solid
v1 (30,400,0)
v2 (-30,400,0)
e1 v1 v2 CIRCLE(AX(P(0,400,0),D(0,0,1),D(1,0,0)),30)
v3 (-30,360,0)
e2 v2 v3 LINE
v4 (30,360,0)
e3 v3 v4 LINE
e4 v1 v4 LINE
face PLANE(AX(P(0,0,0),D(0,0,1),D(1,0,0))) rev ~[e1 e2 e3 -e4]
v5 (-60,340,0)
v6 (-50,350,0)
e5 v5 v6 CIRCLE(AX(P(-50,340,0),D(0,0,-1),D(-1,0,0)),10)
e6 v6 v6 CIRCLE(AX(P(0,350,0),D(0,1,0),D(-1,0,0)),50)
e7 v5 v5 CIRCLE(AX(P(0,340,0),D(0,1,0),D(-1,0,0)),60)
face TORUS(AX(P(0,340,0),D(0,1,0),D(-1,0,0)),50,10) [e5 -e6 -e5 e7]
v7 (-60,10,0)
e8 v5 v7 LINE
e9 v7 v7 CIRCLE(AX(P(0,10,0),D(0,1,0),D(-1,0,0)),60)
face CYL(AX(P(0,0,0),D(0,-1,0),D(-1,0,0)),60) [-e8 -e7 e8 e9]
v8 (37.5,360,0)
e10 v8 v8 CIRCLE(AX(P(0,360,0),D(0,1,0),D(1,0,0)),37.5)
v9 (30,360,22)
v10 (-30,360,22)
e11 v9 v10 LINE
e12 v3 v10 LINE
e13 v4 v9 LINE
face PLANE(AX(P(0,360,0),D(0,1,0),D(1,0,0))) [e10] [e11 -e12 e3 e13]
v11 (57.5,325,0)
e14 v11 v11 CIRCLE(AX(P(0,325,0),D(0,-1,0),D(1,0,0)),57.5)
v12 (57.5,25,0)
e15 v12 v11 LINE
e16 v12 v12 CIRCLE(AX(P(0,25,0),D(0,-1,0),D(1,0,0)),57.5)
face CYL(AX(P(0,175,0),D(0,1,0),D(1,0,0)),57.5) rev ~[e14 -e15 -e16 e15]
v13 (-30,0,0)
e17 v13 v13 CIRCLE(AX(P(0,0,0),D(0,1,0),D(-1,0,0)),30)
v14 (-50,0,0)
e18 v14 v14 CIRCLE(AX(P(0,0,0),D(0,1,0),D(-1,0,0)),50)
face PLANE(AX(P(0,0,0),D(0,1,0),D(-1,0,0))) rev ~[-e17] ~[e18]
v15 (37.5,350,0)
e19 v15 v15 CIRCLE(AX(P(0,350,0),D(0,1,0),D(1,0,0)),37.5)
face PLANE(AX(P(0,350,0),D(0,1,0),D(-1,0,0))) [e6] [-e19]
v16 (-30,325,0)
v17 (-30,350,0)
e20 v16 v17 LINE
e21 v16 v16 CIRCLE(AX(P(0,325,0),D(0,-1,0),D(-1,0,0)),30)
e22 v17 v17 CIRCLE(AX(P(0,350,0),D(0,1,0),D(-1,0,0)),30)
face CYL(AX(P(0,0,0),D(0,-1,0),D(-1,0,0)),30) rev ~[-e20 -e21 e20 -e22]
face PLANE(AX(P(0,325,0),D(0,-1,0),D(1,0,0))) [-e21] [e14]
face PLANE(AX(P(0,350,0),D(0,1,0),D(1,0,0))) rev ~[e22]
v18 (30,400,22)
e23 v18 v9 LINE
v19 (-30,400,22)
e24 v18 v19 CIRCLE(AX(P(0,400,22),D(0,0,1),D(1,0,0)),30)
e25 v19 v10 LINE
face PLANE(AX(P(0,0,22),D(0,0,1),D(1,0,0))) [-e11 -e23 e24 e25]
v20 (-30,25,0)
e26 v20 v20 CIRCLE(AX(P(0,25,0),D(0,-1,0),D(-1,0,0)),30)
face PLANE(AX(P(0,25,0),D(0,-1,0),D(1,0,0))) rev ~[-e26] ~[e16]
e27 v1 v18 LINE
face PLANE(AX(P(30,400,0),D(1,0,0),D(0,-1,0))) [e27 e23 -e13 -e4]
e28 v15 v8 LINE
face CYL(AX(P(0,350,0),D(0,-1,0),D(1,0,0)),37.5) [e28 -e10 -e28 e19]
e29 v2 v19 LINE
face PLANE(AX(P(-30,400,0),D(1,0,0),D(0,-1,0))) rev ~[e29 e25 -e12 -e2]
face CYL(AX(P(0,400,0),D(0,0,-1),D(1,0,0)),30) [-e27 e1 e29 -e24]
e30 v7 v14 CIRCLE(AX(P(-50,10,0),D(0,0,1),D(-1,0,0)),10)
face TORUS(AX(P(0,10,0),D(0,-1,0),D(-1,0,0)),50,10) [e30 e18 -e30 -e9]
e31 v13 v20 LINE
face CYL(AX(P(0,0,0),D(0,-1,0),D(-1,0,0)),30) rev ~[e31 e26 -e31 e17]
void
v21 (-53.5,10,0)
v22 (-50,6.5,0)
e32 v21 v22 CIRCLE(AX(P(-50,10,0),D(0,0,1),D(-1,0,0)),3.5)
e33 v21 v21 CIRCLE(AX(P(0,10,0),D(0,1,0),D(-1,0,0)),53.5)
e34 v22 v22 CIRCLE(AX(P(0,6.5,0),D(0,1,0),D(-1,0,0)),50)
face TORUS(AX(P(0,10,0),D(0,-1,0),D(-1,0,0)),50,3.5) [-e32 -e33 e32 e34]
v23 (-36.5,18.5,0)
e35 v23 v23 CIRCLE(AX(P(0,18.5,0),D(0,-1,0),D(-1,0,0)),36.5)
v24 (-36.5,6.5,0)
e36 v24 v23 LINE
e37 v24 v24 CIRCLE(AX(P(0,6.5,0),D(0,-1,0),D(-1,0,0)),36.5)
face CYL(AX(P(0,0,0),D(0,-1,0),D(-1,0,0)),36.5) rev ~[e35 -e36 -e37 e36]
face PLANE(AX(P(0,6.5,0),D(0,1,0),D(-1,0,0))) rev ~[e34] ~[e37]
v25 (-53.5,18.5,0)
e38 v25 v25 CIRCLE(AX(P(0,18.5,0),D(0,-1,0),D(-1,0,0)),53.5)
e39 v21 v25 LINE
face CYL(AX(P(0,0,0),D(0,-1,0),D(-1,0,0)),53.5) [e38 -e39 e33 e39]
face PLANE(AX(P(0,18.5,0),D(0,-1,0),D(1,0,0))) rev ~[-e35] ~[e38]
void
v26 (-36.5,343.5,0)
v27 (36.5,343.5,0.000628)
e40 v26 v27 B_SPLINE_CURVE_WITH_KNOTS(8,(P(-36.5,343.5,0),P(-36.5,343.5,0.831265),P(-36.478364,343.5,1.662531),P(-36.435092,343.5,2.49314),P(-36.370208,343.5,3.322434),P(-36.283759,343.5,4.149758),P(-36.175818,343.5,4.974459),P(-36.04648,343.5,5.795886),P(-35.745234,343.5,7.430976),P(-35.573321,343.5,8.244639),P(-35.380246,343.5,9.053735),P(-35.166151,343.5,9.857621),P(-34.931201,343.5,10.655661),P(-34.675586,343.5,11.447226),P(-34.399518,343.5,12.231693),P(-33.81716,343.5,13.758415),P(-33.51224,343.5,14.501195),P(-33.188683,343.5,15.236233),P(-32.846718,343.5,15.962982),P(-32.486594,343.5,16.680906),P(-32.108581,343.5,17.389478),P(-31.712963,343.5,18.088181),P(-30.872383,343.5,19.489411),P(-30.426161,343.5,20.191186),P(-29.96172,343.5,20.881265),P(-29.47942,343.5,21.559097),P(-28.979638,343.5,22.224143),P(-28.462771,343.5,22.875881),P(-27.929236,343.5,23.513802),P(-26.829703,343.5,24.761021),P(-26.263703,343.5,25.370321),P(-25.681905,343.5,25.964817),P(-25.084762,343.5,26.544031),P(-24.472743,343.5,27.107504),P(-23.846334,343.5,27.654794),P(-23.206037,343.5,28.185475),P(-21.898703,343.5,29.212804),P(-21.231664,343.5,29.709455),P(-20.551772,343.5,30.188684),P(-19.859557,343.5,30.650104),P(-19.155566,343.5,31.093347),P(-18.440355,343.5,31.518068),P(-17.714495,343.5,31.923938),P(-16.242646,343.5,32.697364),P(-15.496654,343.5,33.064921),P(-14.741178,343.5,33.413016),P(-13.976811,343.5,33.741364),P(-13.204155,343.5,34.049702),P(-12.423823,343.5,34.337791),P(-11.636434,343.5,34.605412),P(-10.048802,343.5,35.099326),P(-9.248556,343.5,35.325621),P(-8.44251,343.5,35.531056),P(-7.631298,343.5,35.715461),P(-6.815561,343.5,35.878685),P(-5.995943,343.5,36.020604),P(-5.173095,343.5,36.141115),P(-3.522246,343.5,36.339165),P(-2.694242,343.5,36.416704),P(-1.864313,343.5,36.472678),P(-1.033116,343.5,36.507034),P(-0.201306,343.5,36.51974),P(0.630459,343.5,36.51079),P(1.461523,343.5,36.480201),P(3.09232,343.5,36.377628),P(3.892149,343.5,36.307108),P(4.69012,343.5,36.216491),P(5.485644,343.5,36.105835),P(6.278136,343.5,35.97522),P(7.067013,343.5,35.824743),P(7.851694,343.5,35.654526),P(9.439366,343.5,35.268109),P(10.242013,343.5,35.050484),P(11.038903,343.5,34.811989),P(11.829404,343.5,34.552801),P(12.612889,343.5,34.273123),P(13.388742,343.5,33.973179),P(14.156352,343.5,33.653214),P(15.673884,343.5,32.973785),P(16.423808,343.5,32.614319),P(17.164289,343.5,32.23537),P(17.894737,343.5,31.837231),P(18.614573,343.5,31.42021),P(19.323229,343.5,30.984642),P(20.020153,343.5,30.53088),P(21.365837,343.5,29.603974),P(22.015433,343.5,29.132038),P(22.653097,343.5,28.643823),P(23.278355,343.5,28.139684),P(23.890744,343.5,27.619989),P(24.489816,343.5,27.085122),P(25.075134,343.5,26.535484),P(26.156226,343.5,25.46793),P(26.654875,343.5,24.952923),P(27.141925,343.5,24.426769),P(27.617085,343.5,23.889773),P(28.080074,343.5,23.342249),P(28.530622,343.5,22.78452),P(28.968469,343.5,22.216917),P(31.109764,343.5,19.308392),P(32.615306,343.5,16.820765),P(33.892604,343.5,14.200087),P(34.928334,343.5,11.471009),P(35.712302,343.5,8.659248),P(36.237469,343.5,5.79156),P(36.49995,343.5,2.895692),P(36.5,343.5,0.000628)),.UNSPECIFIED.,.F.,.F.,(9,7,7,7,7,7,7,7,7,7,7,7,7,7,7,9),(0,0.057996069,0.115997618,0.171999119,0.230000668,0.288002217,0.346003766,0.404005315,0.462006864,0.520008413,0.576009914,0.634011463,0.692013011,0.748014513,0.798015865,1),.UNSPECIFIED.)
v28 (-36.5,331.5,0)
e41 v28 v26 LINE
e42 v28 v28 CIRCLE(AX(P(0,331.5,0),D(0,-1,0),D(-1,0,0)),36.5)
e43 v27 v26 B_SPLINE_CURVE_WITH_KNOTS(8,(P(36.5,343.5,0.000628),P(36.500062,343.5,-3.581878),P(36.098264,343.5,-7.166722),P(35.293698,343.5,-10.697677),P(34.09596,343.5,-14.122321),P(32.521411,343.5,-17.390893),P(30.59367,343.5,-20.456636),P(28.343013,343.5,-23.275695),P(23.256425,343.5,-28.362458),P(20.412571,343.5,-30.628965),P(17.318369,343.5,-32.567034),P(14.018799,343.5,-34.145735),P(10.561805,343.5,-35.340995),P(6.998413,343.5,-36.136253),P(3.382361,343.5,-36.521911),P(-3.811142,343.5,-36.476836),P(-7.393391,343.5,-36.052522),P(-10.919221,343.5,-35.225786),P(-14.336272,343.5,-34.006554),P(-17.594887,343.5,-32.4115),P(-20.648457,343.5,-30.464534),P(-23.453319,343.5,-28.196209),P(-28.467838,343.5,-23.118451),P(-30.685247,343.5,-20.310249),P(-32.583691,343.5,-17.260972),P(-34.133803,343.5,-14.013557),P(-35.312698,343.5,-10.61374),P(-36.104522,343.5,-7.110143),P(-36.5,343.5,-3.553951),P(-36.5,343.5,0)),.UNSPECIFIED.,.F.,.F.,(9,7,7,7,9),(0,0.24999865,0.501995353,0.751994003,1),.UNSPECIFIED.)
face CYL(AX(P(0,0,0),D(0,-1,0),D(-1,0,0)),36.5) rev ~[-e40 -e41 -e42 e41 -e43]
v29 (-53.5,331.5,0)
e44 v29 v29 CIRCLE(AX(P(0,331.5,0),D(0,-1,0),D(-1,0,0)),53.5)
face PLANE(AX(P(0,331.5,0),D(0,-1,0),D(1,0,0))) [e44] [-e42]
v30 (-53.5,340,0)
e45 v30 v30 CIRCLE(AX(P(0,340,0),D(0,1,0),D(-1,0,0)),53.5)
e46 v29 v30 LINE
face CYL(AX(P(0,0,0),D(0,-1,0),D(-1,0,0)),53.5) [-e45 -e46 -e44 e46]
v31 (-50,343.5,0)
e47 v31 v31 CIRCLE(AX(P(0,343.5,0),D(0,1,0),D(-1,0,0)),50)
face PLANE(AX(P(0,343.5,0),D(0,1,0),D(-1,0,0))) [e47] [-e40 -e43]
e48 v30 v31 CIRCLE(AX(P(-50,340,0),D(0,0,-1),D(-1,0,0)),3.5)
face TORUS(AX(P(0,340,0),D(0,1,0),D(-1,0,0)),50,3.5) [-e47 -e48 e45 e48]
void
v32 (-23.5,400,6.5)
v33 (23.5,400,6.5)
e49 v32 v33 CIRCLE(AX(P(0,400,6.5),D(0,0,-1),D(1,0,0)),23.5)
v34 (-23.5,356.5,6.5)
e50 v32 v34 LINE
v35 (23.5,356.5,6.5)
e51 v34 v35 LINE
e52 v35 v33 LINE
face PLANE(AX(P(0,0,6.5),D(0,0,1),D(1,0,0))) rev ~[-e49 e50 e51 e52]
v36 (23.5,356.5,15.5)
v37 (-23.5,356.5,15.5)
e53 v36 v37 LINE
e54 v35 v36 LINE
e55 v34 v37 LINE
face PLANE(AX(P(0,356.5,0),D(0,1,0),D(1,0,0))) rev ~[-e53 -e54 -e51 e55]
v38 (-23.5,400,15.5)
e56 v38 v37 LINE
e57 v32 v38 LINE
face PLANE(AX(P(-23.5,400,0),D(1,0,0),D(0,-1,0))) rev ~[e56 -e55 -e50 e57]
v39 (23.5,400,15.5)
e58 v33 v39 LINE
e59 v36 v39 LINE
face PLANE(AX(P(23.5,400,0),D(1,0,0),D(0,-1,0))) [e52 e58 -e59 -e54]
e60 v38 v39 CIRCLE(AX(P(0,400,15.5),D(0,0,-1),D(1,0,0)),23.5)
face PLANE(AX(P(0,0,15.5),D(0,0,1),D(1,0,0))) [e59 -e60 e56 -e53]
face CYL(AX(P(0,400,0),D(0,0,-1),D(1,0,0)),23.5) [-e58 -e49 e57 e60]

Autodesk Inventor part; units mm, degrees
ref_plane "YZ Plane" through (0, 0, 0) normal (1, 0, 0) x (0, 1, 0)
ref_plane "XZ Plane" through (0, 0, 0) normal (0, 1, 0) x (-1, 0, 0)
sketch "Sketch1" plane through (0, 0, 0) normal (0, 1, 0) x (-1, 0, 0)
  circle A0 centre (0, 0) radius 60
  circle A1 centre (0, 0) radius 30
  dimension "d0" = 120
  dimension "d3" = 60
extrude "Extrusion1" add sketch "Sketch1" along normal blind 350
sketch "Sketch2" plane through (0, 350, 0) normal (0, 1, 0) x (1, 0, 0)
  circle A0 centre (0, 0) radius 37.5
  dimension "d7" = 75
extrude "Extrusion2" add sketch "Sketch2" along normal blind 10
sketch "Sketch4" plane through (0, 360, 0) normal (0, 1, 0) x (1, 0, 0)
  point P0 (0, 0)
sketch "Sketch5" plane through (0, 0, 0) normal (0, 0, 1) x (1, 0, 0)
  line L0 (37.5, 360) -> (-37.5, 360) projected
  line L1 (0, 360) -> (0, 400)
  circle A0 centre (0, 400) radius 30
  line L2 (30, 400) -> (30, 360)
  line L3 (-30, 400) -> (-30, 360)
  line L4 (-30, 360) -> (30, 360)
  point P0 (0, 0)
  dimension "d13" = 40
  dimension "d14" = 60
extrude "Extrusion4" add sketch "Sketch5" along normal blind 22
fillet "Fillet1" radius 10 2 edges at (60, 350, 0) (60, 0, 0)
ref_plane "Work Plane1" through (0, 175, 0) normal (0, -1, 0) x (1, 0, 0)
sketch "Sketch6" plane through (0, 175, 0) normal (0, -1, 0) x (1, 0, 0)
  circle A0 centre (0, 0) radius 57.5
  dimension "d23" = 115
extrude "Extrusion5" cut sketch "Sketch6" along normal mid plane 300
shell "Shell1" thickness 6.5 removed faces 0
properties part number "Arm1" material "Aluminum 6061"
